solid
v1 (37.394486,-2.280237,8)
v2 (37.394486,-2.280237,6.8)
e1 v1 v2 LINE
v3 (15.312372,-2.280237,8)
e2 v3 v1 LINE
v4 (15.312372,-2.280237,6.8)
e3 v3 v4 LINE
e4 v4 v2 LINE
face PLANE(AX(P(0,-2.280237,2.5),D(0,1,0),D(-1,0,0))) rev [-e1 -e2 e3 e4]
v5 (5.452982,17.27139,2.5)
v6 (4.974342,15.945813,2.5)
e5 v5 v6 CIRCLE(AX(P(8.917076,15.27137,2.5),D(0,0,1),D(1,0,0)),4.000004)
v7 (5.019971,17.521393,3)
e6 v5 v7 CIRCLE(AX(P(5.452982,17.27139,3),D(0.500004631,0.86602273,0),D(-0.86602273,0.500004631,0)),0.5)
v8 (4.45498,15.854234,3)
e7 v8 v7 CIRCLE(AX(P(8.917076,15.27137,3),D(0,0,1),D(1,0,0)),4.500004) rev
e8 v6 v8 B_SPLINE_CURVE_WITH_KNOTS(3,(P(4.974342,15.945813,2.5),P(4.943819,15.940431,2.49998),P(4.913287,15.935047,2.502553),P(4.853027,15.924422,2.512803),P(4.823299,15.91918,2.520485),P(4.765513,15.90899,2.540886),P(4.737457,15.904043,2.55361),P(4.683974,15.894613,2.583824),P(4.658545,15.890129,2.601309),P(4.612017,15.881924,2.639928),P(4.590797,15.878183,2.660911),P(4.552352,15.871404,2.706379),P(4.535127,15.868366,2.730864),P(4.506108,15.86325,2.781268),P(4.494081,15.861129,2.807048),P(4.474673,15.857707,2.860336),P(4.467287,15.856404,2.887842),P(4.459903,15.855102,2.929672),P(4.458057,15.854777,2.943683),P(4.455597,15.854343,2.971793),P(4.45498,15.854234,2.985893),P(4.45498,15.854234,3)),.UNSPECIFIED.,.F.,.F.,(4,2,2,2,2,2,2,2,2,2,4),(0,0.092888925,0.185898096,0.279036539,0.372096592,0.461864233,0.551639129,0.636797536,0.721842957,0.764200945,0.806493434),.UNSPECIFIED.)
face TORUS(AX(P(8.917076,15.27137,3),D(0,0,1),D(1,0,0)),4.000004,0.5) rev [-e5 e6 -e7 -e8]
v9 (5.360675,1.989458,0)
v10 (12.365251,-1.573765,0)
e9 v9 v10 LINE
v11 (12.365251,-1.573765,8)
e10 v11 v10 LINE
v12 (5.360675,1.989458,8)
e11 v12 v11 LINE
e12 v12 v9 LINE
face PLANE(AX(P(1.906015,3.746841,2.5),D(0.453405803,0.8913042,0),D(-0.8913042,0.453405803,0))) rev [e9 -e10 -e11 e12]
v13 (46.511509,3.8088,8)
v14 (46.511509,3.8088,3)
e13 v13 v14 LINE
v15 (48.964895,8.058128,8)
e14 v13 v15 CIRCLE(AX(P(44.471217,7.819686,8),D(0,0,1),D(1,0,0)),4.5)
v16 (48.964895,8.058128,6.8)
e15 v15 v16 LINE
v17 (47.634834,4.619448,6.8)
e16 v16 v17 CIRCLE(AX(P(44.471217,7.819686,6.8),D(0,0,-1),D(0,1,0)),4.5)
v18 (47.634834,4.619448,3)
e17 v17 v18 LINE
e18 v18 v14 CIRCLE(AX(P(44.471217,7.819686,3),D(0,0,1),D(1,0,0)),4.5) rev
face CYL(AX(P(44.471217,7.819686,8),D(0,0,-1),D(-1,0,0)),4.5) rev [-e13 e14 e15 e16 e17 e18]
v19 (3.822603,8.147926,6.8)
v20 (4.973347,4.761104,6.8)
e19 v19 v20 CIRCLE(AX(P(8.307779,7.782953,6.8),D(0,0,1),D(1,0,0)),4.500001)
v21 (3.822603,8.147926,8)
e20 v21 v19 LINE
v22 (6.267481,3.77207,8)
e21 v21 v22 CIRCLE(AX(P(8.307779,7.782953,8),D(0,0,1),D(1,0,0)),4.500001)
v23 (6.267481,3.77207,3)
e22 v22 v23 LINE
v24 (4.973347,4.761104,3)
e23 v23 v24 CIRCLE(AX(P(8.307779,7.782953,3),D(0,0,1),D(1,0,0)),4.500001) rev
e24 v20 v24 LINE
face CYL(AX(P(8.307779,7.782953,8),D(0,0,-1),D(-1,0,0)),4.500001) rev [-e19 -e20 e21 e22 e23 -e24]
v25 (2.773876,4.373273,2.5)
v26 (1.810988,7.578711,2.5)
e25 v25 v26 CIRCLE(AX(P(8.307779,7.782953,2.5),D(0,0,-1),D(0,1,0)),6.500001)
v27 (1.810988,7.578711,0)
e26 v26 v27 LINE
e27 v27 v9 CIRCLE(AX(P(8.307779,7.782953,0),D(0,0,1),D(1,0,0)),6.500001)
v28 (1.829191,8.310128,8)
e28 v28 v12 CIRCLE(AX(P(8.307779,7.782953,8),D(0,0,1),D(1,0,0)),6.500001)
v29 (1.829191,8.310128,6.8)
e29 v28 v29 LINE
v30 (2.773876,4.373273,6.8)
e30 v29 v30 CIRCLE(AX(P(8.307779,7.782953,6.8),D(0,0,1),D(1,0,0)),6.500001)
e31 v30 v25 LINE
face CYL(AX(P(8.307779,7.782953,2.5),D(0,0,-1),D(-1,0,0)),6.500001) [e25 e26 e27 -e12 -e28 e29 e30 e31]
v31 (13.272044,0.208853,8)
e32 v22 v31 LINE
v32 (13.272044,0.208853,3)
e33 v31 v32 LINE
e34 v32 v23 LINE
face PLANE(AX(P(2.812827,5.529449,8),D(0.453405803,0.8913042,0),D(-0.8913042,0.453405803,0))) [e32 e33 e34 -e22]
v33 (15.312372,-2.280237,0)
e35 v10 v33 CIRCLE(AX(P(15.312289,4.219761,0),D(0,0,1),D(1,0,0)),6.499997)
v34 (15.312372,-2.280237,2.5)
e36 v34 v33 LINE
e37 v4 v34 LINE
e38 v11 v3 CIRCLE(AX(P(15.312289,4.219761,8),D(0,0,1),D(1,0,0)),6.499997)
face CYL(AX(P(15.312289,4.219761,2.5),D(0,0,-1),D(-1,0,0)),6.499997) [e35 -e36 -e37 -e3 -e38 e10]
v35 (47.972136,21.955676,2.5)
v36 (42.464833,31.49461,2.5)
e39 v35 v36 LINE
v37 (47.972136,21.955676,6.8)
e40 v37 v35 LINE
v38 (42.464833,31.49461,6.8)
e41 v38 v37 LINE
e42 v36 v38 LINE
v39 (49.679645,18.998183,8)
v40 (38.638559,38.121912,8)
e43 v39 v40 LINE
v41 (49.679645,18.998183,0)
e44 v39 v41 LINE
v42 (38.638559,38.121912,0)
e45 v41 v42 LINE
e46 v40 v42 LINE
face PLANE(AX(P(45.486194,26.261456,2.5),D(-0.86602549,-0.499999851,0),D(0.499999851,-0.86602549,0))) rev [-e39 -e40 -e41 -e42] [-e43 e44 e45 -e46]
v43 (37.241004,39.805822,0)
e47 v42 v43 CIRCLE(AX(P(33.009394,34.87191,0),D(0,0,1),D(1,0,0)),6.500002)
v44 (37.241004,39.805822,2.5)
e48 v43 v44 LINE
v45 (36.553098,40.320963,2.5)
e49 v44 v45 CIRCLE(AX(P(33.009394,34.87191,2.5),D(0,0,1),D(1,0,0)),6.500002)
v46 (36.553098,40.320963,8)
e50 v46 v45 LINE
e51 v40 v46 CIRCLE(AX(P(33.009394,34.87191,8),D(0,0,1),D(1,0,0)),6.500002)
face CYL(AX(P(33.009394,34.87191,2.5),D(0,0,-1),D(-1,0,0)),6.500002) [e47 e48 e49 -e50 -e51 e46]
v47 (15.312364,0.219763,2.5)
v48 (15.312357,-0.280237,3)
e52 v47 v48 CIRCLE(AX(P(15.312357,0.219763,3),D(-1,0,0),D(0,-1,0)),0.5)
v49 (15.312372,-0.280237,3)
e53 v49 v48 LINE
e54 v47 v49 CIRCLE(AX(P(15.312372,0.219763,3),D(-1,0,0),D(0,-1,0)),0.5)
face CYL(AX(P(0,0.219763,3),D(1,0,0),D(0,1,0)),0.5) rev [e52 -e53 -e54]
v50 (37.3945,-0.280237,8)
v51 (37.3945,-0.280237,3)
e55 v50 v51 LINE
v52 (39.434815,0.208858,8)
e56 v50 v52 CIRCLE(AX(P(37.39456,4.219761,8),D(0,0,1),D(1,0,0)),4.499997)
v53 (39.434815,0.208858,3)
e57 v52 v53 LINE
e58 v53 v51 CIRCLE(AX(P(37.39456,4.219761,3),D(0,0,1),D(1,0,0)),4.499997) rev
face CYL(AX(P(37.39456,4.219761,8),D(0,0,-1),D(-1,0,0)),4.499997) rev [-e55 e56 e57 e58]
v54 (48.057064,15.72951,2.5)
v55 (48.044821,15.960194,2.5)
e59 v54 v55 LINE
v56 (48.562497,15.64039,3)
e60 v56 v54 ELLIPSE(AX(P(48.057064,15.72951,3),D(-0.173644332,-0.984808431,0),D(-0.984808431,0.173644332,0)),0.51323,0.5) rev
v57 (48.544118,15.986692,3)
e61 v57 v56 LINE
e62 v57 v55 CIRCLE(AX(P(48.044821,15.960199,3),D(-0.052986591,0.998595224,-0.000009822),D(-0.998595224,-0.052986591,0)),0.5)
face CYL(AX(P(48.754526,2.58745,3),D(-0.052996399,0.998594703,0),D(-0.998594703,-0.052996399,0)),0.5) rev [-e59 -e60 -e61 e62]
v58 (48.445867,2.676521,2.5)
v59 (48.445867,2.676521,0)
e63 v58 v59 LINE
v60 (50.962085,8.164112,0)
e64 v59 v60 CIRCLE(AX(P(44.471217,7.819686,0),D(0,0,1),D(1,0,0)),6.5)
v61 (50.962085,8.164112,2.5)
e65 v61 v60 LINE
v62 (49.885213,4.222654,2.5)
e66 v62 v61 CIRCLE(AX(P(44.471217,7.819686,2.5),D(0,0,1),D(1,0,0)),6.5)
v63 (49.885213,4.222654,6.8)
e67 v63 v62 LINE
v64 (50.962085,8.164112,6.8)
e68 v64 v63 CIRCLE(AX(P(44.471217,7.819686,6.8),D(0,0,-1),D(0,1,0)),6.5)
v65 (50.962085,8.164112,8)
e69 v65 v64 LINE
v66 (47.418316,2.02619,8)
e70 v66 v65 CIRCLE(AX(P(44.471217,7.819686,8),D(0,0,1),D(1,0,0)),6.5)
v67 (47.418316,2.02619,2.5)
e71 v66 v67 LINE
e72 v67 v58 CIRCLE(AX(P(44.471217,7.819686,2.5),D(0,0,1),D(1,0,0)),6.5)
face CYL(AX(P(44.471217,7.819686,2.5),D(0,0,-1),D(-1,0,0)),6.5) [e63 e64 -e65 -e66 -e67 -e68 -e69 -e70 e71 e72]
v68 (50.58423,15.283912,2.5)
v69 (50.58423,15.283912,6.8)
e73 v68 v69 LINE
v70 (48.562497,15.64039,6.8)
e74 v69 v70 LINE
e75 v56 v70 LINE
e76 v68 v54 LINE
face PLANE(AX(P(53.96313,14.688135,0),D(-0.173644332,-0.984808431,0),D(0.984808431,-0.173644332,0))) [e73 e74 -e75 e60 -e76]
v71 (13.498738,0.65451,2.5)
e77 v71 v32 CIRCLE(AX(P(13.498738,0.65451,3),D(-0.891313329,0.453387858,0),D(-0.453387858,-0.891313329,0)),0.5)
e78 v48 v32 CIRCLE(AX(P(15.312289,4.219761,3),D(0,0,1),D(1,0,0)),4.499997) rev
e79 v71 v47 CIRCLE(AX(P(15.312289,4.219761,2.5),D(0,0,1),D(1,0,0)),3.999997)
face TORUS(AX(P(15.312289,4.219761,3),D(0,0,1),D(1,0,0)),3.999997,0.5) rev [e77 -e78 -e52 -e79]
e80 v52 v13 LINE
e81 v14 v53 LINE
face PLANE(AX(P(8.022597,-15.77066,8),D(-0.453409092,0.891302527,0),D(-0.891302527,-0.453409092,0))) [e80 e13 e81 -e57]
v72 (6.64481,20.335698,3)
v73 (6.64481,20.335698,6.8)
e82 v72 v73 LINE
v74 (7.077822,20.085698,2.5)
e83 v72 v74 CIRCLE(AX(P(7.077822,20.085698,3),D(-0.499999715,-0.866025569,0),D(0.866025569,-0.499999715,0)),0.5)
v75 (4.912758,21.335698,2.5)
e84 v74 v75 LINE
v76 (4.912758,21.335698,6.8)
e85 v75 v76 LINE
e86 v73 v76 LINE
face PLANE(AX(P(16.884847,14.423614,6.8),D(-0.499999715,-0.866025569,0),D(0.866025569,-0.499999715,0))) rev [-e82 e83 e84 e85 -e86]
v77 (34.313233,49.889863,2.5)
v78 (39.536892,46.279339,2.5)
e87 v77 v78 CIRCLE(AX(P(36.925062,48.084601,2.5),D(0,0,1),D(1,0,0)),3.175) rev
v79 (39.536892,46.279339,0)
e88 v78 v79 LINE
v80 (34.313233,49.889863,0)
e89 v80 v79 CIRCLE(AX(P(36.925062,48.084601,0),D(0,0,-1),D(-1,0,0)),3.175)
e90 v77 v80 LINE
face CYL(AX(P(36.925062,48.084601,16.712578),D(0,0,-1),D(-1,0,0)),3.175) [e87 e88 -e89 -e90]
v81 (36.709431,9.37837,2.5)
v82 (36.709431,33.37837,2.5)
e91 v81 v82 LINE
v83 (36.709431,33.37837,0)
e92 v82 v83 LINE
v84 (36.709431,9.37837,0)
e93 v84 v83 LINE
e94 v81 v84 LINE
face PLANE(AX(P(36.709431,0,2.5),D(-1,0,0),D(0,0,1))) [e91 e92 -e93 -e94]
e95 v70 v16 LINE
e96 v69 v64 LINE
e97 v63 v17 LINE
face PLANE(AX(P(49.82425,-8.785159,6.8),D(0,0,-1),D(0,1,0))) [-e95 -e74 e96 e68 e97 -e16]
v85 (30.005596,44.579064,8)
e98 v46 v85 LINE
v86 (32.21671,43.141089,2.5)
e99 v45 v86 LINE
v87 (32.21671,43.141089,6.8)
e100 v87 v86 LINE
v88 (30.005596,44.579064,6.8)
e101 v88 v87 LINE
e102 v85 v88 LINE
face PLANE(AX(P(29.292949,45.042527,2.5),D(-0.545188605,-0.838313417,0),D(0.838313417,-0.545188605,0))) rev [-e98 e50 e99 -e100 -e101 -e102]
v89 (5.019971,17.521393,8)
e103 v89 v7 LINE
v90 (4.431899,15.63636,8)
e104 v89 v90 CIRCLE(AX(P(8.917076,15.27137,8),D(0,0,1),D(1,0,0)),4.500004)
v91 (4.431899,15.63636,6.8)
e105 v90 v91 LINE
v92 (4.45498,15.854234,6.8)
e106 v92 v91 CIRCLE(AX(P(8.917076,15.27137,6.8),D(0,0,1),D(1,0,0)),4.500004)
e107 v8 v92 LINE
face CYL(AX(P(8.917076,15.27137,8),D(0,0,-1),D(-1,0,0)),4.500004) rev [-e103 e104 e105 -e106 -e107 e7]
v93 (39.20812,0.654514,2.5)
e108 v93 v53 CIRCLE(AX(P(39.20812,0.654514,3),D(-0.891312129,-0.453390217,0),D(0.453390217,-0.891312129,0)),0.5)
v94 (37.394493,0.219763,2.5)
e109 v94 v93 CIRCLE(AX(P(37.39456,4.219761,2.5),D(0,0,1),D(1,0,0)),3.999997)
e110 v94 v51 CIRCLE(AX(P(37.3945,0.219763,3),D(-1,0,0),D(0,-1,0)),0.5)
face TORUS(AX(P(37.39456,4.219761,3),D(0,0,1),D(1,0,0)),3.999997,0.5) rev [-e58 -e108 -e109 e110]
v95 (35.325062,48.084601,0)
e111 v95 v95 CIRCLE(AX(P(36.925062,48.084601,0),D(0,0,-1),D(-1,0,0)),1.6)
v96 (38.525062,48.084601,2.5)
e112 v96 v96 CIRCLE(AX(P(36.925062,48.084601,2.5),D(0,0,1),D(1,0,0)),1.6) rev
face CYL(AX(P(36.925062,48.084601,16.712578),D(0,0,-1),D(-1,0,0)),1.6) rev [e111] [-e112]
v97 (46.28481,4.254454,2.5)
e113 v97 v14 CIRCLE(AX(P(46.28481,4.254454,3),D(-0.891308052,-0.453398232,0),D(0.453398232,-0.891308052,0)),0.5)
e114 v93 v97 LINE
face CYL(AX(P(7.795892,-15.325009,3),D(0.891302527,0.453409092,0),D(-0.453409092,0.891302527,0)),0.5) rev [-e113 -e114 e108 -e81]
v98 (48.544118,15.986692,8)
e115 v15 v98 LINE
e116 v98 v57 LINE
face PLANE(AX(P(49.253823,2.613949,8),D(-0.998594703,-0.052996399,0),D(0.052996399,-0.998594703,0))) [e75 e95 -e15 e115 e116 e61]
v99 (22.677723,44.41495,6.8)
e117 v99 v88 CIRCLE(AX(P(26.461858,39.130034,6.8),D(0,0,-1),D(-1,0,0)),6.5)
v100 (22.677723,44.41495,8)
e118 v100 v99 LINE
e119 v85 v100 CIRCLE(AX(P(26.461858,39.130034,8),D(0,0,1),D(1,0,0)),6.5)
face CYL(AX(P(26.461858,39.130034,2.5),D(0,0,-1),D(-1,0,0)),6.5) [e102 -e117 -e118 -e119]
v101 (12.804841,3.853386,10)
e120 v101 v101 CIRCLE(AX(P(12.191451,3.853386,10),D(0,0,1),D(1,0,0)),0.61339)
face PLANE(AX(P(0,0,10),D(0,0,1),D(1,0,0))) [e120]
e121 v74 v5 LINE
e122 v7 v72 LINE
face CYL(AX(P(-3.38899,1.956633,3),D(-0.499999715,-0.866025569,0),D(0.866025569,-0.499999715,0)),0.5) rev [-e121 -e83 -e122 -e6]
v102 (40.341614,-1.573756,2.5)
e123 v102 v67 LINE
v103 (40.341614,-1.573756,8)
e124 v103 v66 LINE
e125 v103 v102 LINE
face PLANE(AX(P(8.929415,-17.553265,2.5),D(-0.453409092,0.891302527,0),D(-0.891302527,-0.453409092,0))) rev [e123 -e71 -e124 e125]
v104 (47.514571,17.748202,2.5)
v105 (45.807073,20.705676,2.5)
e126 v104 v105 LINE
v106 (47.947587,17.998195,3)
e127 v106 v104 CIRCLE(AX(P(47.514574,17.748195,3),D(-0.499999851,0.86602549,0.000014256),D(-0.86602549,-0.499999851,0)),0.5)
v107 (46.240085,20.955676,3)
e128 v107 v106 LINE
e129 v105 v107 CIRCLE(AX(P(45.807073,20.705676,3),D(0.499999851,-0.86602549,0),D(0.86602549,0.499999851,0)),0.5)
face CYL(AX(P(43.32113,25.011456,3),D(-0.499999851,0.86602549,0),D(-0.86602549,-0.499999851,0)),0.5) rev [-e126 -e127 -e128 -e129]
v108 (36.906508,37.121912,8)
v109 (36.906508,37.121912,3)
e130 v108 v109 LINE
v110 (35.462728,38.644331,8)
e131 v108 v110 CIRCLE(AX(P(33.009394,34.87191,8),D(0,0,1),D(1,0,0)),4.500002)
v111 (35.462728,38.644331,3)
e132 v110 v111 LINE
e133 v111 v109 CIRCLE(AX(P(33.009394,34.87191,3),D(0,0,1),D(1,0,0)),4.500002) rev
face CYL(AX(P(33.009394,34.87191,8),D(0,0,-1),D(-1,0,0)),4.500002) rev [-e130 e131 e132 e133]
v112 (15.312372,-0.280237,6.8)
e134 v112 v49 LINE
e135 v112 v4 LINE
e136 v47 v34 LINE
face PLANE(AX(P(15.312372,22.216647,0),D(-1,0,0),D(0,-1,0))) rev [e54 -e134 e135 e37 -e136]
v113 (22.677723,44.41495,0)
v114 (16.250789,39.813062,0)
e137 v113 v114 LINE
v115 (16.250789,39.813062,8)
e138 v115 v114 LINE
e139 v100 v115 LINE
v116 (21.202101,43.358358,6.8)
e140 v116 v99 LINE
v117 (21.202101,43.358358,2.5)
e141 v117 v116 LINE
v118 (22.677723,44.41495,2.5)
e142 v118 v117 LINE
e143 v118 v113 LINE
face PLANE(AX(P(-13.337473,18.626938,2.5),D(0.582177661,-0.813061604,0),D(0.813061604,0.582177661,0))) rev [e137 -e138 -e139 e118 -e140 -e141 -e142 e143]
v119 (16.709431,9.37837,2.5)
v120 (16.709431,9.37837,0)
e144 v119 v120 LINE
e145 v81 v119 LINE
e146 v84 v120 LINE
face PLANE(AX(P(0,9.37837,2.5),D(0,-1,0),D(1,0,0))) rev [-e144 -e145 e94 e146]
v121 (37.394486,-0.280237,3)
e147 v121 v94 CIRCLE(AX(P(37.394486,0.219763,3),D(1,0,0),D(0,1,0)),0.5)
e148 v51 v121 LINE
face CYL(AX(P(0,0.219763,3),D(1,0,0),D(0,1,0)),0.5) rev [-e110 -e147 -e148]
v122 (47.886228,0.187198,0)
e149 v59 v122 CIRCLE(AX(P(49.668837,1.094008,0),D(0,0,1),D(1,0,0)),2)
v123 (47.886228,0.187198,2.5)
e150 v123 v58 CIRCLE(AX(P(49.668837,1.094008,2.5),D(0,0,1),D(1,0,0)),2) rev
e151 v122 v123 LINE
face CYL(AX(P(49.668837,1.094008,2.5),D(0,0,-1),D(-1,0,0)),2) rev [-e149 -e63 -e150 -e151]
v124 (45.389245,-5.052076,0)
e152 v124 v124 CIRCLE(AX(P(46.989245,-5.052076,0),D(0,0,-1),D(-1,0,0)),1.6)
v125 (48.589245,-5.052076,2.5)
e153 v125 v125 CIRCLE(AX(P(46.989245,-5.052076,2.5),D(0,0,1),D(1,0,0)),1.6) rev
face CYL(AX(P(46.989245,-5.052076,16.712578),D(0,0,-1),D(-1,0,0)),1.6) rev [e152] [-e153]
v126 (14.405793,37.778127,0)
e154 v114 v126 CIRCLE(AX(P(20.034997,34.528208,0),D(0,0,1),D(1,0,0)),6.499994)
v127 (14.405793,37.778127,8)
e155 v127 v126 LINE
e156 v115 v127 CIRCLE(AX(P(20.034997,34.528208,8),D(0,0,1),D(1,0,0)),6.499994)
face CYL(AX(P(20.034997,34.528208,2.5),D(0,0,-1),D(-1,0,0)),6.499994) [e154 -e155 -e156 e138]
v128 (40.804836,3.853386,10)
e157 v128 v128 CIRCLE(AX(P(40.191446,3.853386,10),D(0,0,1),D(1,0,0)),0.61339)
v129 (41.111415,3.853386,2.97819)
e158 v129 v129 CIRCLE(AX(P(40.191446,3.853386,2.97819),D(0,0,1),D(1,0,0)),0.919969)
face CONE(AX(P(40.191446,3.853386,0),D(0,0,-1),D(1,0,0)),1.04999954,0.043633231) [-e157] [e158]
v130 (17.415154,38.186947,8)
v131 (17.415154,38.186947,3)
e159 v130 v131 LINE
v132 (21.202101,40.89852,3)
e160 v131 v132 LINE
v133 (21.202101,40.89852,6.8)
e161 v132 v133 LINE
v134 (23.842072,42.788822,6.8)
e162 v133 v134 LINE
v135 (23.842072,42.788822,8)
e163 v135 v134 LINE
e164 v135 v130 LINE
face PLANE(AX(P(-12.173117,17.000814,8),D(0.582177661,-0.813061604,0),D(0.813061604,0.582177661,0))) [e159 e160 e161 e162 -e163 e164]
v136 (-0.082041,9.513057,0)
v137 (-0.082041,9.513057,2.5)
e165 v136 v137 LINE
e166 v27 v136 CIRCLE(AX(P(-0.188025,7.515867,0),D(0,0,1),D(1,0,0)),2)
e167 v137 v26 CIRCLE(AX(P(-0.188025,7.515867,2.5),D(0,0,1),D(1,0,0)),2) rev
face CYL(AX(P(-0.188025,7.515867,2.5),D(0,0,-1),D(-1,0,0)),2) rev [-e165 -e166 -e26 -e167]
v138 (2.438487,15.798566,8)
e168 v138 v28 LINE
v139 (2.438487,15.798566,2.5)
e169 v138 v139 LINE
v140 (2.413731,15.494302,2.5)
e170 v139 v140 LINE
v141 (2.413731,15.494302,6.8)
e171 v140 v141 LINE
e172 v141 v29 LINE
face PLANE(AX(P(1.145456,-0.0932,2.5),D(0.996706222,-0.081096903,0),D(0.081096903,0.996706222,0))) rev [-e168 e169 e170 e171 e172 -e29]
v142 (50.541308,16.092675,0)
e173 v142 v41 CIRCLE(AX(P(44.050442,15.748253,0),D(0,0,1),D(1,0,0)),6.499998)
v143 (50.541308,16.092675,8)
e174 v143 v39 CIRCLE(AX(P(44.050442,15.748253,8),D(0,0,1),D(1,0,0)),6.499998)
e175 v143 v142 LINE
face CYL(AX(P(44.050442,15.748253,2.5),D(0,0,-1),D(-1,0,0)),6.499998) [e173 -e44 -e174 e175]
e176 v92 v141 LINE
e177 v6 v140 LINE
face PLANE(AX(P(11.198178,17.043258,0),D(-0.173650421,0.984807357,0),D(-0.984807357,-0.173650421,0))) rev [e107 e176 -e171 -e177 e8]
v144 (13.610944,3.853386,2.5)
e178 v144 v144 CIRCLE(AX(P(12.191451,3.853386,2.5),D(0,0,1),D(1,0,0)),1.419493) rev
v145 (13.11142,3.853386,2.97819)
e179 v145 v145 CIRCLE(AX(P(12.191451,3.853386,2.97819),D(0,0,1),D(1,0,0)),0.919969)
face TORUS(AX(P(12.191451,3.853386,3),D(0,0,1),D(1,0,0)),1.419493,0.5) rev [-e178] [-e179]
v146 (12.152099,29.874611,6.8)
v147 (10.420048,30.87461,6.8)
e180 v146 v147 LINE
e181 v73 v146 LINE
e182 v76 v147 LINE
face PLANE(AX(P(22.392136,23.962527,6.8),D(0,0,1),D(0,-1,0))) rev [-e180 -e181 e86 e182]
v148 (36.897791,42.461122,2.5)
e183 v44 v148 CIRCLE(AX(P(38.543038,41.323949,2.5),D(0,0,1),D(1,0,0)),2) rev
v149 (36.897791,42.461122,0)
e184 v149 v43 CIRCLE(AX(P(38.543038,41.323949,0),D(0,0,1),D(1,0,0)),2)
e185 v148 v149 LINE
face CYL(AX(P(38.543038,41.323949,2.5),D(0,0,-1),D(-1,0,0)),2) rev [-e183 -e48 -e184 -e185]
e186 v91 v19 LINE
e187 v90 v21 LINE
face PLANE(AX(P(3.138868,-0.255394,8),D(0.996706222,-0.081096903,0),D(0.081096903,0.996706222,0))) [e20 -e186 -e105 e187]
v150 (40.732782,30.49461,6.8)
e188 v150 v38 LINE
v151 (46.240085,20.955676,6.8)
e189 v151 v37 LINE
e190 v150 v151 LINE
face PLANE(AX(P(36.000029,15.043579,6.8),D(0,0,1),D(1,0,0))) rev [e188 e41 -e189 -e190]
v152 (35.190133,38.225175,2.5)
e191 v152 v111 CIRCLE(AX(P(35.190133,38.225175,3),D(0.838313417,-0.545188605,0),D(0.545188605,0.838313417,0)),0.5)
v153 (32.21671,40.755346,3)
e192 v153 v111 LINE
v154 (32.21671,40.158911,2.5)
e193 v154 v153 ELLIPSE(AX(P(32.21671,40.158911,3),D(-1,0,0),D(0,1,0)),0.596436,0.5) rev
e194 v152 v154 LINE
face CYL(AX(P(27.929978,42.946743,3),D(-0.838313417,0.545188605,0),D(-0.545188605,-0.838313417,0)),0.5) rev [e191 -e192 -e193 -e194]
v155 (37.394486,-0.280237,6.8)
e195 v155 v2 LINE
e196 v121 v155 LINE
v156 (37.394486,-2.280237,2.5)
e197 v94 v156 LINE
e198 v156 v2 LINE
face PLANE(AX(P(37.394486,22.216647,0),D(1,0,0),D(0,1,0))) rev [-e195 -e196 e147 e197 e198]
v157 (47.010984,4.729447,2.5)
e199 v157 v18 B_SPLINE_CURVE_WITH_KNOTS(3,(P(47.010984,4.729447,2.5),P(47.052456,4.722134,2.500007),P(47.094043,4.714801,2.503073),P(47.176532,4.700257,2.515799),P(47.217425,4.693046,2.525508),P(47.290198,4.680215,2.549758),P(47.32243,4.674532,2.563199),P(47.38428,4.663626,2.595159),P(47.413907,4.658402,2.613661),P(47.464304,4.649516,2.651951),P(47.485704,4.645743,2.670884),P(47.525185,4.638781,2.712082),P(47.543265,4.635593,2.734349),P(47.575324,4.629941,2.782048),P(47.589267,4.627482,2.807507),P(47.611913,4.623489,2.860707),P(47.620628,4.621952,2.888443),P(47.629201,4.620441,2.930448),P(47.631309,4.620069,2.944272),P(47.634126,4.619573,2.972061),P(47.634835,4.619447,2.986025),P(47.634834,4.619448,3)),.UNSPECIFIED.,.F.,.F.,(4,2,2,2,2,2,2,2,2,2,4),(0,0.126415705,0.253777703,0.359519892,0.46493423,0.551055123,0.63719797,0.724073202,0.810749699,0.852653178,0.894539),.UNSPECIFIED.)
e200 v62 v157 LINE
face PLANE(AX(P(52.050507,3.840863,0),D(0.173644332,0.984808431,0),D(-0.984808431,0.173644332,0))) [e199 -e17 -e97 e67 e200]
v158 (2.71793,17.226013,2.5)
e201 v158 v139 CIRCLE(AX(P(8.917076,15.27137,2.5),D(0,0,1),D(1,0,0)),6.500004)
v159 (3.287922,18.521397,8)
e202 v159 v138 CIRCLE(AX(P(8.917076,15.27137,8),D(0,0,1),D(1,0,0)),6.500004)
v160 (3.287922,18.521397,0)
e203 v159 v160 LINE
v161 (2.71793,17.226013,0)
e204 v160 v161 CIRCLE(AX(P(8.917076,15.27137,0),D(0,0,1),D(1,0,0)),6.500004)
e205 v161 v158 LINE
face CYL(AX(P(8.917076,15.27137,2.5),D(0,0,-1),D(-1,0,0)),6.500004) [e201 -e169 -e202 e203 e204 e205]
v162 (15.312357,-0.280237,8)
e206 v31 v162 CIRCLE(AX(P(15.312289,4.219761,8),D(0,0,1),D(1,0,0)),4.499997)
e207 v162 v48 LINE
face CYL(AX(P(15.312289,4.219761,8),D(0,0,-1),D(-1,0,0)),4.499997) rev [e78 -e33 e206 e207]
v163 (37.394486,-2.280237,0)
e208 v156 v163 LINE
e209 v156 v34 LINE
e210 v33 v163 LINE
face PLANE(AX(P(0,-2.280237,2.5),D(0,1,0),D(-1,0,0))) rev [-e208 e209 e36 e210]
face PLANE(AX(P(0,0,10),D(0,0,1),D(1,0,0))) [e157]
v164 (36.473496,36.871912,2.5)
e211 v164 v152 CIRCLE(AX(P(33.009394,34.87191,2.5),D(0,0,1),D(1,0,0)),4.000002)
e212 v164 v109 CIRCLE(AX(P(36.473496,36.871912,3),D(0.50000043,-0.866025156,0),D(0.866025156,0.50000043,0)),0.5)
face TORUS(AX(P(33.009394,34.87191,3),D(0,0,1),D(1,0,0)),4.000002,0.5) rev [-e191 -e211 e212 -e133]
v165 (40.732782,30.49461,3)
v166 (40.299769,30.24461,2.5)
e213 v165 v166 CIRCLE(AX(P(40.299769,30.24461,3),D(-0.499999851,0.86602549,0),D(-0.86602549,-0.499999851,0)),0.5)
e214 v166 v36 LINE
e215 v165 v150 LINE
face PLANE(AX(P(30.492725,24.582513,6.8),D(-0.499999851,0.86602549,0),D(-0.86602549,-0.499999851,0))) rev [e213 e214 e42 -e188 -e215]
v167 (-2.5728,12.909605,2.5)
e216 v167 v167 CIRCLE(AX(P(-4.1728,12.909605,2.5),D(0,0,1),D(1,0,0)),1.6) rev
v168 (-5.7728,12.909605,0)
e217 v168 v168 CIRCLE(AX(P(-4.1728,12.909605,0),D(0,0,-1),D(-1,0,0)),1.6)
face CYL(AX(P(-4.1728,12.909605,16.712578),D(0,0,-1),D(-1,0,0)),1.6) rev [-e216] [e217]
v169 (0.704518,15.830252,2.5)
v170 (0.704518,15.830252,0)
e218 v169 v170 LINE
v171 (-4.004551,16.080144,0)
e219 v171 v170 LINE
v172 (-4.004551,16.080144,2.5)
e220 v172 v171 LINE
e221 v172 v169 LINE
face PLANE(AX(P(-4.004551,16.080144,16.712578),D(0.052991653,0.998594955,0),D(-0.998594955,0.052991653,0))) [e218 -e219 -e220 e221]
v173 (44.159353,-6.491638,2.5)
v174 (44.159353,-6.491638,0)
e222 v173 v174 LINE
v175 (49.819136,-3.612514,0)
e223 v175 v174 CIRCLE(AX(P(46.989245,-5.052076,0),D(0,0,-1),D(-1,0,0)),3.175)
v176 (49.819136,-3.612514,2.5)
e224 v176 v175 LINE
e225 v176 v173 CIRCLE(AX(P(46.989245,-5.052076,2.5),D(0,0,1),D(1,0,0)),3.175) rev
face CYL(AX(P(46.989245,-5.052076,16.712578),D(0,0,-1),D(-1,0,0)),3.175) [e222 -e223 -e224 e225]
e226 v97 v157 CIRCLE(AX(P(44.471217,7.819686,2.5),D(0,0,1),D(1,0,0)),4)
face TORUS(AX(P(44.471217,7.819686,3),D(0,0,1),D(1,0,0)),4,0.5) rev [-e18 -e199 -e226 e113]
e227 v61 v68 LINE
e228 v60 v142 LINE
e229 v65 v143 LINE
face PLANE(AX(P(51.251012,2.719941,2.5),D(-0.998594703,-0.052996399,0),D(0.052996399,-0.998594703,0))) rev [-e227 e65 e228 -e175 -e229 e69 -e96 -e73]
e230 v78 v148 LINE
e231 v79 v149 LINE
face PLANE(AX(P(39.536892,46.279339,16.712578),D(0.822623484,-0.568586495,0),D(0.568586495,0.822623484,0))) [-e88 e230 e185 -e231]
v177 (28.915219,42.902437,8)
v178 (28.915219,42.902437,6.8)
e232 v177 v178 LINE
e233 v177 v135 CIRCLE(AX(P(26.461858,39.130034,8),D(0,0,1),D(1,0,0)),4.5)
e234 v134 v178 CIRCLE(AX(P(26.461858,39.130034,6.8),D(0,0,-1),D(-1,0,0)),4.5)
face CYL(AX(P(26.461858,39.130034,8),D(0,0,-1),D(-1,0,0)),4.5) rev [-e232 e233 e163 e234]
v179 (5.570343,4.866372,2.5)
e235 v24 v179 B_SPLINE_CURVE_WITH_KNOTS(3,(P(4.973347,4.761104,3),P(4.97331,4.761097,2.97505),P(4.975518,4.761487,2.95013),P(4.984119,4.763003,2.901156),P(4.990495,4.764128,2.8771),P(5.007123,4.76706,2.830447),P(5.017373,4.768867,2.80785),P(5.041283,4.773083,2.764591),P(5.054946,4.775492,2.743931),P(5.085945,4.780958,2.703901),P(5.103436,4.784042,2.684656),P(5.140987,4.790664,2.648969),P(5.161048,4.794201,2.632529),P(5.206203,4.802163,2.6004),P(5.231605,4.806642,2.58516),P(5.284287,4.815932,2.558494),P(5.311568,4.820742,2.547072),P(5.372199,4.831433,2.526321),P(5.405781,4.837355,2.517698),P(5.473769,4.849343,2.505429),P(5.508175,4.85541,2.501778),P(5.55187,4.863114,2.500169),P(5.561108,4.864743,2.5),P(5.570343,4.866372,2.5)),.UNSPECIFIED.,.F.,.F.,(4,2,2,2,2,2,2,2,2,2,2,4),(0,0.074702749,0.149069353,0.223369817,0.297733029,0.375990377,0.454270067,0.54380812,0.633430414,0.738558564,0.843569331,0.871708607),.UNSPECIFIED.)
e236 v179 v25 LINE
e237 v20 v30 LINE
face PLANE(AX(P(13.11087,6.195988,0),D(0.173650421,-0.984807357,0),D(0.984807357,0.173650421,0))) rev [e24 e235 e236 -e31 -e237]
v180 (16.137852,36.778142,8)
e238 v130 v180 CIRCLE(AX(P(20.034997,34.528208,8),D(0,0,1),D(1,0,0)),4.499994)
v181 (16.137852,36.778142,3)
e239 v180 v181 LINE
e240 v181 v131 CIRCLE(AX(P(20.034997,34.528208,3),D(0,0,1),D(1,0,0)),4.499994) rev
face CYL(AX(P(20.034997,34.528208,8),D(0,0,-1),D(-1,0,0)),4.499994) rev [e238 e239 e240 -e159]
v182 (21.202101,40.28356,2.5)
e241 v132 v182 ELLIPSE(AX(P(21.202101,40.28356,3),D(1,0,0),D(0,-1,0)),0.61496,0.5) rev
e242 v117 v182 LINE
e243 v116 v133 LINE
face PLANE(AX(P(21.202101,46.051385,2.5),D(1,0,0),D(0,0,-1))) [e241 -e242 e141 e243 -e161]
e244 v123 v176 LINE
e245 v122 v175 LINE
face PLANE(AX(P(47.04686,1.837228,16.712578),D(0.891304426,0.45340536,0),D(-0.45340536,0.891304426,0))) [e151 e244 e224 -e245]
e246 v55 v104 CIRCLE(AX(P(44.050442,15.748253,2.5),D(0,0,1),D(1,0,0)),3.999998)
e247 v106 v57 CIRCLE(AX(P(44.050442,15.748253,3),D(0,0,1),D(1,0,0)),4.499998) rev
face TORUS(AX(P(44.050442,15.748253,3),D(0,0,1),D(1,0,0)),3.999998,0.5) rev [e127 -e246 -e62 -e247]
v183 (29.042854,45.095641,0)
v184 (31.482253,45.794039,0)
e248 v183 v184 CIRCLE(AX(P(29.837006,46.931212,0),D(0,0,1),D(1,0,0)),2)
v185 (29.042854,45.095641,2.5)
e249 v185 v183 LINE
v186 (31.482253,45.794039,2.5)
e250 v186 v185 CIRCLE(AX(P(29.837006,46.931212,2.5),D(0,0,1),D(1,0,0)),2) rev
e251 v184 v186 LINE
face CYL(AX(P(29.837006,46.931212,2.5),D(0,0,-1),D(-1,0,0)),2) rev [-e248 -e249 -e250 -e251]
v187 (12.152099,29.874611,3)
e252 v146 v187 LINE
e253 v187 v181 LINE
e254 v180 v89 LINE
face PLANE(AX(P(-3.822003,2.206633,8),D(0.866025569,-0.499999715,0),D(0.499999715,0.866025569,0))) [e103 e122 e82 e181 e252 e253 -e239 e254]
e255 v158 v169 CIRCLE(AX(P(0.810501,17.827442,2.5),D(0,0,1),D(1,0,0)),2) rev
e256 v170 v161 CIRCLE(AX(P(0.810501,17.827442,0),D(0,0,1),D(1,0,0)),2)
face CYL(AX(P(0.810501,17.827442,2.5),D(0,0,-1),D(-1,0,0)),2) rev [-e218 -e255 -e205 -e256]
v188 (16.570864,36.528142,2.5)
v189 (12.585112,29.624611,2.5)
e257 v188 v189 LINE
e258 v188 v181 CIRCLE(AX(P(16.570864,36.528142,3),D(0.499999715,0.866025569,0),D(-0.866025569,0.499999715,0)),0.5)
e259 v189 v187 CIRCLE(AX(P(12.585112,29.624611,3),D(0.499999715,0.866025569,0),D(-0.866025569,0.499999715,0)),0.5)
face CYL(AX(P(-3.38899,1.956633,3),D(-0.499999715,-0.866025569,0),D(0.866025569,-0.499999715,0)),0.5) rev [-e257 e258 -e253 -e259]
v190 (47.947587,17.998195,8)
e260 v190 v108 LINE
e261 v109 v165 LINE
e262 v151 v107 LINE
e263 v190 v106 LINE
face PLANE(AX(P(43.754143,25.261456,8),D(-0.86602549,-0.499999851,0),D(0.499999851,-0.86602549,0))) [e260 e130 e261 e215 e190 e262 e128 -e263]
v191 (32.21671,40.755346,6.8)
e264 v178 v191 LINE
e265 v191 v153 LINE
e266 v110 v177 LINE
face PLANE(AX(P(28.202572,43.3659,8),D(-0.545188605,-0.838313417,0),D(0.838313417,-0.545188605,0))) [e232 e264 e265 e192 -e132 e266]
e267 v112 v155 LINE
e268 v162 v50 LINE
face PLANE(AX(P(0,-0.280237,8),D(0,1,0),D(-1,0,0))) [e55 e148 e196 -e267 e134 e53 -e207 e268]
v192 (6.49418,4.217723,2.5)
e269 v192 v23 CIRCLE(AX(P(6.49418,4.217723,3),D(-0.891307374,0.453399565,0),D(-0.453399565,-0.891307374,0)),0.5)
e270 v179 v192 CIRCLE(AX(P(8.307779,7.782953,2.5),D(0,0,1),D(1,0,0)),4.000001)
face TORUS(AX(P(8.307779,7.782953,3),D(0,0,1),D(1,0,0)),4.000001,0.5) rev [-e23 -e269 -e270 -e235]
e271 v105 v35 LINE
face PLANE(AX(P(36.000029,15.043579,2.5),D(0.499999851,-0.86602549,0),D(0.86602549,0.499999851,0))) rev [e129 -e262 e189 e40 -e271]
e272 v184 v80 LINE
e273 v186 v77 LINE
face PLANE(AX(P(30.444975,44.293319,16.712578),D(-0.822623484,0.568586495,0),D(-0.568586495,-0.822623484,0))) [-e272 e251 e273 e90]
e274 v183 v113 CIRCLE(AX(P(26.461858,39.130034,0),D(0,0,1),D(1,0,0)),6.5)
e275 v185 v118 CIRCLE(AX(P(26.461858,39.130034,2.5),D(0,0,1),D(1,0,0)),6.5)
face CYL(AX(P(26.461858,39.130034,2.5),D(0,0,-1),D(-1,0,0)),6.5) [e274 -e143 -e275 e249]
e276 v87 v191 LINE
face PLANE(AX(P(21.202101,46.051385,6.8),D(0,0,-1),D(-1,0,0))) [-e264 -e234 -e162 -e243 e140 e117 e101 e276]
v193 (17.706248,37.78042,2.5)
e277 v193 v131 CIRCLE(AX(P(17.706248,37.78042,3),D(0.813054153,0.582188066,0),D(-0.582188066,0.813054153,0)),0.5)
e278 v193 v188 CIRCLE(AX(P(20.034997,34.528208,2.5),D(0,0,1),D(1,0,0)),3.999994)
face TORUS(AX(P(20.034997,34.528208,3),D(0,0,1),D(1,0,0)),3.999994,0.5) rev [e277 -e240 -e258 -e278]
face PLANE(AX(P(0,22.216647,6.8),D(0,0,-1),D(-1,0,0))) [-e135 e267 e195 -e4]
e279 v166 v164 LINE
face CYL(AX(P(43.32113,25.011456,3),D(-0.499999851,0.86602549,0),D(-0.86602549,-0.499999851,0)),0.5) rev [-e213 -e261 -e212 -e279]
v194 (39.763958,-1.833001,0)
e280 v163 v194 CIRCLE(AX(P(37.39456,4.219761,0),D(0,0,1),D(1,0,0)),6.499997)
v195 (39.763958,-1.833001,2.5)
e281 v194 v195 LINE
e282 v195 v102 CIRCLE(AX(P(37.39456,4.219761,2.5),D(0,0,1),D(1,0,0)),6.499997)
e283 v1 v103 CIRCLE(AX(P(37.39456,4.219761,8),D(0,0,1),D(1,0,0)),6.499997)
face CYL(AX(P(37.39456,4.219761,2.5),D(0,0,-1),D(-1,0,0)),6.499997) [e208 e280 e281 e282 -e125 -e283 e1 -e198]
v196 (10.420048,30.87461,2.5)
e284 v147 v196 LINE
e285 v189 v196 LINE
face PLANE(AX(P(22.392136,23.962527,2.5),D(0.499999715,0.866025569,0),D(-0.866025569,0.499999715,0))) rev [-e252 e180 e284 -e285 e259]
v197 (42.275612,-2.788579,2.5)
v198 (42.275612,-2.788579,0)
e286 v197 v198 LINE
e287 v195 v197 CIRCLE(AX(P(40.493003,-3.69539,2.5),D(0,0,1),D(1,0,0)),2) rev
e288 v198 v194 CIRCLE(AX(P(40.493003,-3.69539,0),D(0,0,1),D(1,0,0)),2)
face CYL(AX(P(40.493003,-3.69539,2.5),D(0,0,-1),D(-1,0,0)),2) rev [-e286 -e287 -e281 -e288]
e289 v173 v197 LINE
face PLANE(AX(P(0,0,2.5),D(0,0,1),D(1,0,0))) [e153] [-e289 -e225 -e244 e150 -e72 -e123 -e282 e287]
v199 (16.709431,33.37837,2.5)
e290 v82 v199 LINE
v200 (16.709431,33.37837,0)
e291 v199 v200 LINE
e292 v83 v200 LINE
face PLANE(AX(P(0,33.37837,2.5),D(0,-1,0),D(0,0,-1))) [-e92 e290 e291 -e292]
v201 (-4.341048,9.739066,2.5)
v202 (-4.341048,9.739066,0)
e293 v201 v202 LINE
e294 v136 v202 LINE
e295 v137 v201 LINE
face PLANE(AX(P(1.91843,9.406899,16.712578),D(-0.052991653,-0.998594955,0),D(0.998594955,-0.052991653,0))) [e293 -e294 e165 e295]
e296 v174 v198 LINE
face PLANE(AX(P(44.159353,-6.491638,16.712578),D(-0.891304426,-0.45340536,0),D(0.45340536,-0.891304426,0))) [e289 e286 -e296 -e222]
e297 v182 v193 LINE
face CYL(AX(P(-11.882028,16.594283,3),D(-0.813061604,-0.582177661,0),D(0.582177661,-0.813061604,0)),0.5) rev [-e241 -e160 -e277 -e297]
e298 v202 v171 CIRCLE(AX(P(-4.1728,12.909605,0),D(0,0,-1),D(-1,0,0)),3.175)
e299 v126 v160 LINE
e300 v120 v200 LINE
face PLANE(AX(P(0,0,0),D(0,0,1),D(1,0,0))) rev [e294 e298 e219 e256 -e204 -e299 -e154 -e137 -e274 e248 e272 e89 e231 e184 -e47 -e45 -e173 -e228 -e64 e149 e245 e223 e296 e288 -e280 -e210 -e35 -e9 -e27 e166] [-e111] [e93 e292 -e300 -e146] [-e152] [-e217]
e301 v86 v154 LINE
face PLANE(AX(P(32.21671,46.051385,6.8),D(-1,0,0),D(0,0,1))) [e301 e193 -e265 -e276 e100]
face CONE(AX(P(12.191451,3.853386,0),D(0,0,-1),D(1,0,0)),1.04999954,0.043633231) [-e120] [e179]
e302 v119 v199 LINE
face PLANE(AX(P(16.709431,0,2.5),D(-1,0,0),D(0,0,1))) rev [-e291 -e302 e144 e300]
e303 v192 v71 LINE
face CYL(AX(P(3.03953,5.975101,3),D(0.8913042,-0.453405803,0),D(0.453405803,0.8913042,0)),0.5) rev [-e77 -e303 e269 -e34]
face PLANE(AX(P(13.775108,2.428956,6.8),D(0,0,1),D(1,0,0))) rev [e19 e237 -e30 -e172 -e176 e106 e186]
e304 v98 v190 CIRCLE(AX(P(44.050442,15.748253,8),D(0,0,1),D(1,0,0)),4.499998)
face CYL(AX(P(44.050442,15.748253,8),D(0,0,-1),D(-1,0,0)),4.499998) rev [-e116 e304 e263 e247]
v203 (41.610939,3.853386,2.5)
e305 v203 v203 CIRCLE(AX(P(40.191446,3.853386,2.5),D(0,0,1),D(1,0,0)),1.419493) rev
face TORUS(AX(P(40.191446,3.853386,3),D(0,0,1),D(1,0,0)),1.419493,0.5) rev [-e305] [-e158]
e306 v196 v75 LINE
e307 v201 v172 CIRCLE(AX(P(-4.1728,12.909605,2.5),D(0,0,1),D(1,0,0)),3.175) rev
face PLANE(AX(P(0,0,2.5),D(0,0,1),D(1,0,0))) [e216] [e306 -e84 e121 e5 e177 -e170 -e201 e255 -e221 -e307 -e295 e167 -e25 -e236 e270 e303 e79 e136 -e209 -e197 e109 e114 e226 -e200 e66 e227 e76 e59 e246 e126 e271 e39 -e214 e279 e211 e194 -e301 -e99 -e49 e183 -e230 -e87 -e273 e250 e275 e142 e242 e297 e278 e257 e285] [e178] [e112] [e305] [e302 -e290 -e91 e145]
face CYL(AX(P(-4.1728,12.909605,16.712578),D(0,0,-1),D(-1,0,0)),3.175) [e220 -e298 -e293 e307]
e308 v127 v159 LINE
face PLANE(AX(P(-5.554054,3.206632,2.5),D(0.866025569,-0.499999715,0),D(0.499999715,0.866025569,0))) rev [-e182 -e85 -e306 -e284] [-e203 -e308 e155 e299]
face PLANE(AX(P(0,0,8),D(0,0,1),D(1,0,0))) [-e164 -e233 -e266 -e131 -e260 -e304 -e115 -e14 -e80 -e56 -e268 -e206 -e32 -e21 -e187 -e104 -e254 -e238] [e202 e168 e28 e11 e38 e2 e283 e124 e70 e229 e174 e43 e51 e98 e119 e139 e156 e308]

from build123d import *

# Parameters (mm, degrees)
SKETCH4_W                     = 20
SKETCH4_H                     = 24
BOSS_EXTRUDE1_DEPTH           = 2.5
BOSS_EXTRUDE3_DEPTH           = 8
SKETCH4_5_R                   = 1.04999954
BOSS_EXTRUDE4_DEPTH           = 10
BOSS_EXTRUDE4_DRAFT           = 2.5
BOSS_EXTRUDE4_PROFILE_2_DEPTH = 10
BOSS_EXTRUDE4_PROFILE_2_DRAFT = 2.5
SKETCH5_W                     = 22.082114238
SKETCH5_H                     = 4.3
CUT_EXTRUDE1_DEPTH            = 2
SKETCH6_W                     = 4.3
SKETCH6_H                     = 11.01458554
CUT_EXTRUDE2_DEPTH            = 2
SKETCH7_W                     = 4.3
SKETCH7_H                     = 11.01461094
CUT_EXTRUDE3_DEPTH            = 2
SKETCH8_W                     = 11.0146084
SKETCH8_H                     = 4.3
CUT_EXTRUDE5_DEPTH            = 7
CUT_EXTRUDE6_DEPTH            = 7
CUT_EXTRUDE6_DEPTH_BACK       = 7
SKETCH9_W                     = 4.3
SKETCH9_H                     = 11.01461094
SKETCH10_W                    = 4.3
SKETCH10_H                    = 11.01460078
CUT_EXTRUDE7_DEPTH            = 50.390708853
FILLET1_R                     = 0.5
SKETCH11_R                    = 1.6
BOSS_EXTRUDE5_DEPTH           = 2.5
FILLET2_R                     = 2
FILLET3_R                     = 0.5


with BuildPart() as part:
    # Sketch4 → Boss-Extrude1 (new body)
    with BuildSketch(Plane.XY):
        with BuildLine():
            Line((14.40579252, 37.778127459), (3.287922462, 18.521396993))
            ThreePointArc((3.287922462, 18.521396993), (2.712012987, 17.207148367), (2.438487448, 15.798565764))
            Line((2.438487448, 15.798565764), (1.829191453, 8.310127992))
            ThreePointArc((1.829191453, 8.310127992), (2.63339515, 4.61256251), (5.360675193, 1.989457929))
            Line((5.360675193, 1.989457929), (12.365250755, -1.573764605))
            ThreePointArc((12.365250755, -1.573764605), (13.797062184, -2.101161427), (15.312371851, -2.28023681))
            Line((15.312371851, -2.28023681), (37.394486089, -2.28023681))
            ThreePointArc((37.394486089, -2.28023681), (38.909799875, -2.101158221), (40.3416142, -1.57375633))
            Line((40.3416142, -1.57375633), (47.418316215, 2.026189747))
            ThreePointArc((47.418316215, 2.026189747), (50.100366868, 4.569660453), (50.962085043, 8.164111834))
            Line((50.962085043, 8.164111834), (50.541308423, 16.092675178))
            ThreePointArc((50.541308423, 16.092675178), (50.282176527, 17.596348563), (49.679645161, 18.998182698))
            Line((49.679645161, 18.998182698), (38.638559268, 38.121912018))
            ThreePointArc((38.638559268, 38.121912018), (37.725784419, 39.344680467), (36.553097986, 40.32096277))
            Line((36.553097986, 40.32096277), (30.005596257, 44.579063932))
            ThreePointArc((30.005596257, 44.579063932), (26.31632103, 45.628405202), (22.677723188, 44.41494958))
            Line((22.677723188, 44.41494958), (16.250788585, 39.813062423))
            ThreePointArc((16.250788585, 39.813062423), (15.219571198, 38.894166534), (14.40579252, 37.778127459))
        make_face()
        with Locations((26.709430744, 21.378369589)):
            Rectangle(SKETCH4_W, SKETCH4_H, mode=Mode.SUBTRACT)
    extrude(amount=BOSS_EXTRUDE1_DEPTH)

    # Sketch4<4> → Boss-Extrude3 (add)
    with BuildSketch(Plane.XY):
        with BuildLine():
            Line((22.677723188, 44.41494958), (16.250788585, 39.813062423))
            ThreePointArc((16.250788585, 39.813062423), (15.219571198, 38.894166534), (14.40579252, 37.778127459))
            Line((14.40579252, 37.778127459), (3.287922462, 18.521396993))
            ThreePointArc((3.287922462, 18.521396993), (2.712012987, 17.207148367), (2.438487448, 15.798565764))
            Line((2.438487448, 15.798565764), (1.829191453, 8.310127992))
            ThreePointArc((1.829191453, 8.310127992), (2.63339515, 4.61256251), (5.360675193, 1.989457929))
            Line((5.360675193, 1.989457929), (12.365250755, -1.573764605))
            ThreePointArc((12.365250755, -1.573764605), (13.797062184, -2.101161427), (15.312371851, -2.28023681))
            Line((15.312371851, -2.28023681), (37.394486089, -2.28023681))
            ThreePointArc((37.394486089, -2.28023681), (38.909799875, -2.101158221), (40.3416142, -1.57375633))
            Line((40.3416142, -1.57375633), (47.418316215, 2.026189747))
            ThreePointArc((47.418316215, 2.026189747), (50.100366868, 4.569660453), (50.962085043, 8.164111834))
            Line((50.962085043, 8.164111834), (50.541308423, 16.092675178))
            ThreePointArc((50.541308423, 16.092675178), (50.282176527, 17.596348563), (49.679645161, 18.998182698))
            Line((49.679645161, 18.998182698), (38.638559268, 38.121912018))
            ThreePointArc((38.638559268, 38.121912018), (37.725784419, 39.344680467), (36.553097986, 40.32096277))
            Line((36.553097986, 40.32096277), (30.005596257, 44.579063932))
            ThreePointArc((30.005596257, 44.579063932), (26.31632103, 45.628405202), (22.677723188, 44.41494958))
        make_face()
        with BuildLine():
            ThreePointArc((28.915219047, 42.902437098), (26.361103849, 43.62890664), (23.842072273, 42.788821908))
            Line((23.842072273, 42.788821908), (17.415154311, 38.186946666))
            ThreePointArc((17.415154311, 38.186946666), (16.701235421, 37.550786049), (16.137851593, 36.778141775))
            Line((16.137851593, 36.778141775), (5.01997076, 17.521392647))
            ThreePointArc((5.01997076, 17.521392647), (4.621263952, 16.611530408), (4.43189892, 15.636360013))
            Line((4.43189892, 15.636360013), (3.822603234, 8.147926041))
            ThreePointArc((3.822603234, 8.147926041), (4.379359007, 5.588067615), (6.267480562, 3.772069503))
            Line((6.267480562, 3.772069503), (13.272044416, 0.208852925))
            ThreePointArc((13.272044416, 0.208852925), (14.263297755, -0.156264413), (15.312356713, -0.280236811))
            Line((15.312356713, -0.280236811), (37.394499544, -0.280236811))
            ThreePointArc((37.394499544, -0.280236811), (38.443560406, -0.156262143), (39.434814891, 0.208858326))
            Line((39.434814891, 0.208858326), (46.511508891, 3.808800326))
            ThreePointArc((46.511508891, 3.808800326), (48.368316966, 5.56966202), (48.964895143, 8.058128338))
            Line((48.964895143, 8.058128338), (48.544118496, 15.986692189))
            ThreePointArc((48.544118496, 15.986692189), (48.364721527, 17.027695486), (47.947587053, 17.998195342))
            Line((47.947587053, 17.998195342), (36.906508289, 37.121912315))
            ThreePointArc((36.906508289, 37.121912315), (36.274587318, 37.968443941), (35.462727713, 38.644331426))
            Line((35.462727713, 38.644331426), (28.915219047, 42.902437098))
        make_face(mode=Mode.SUBTRACT)
    extrude(amount=BOSS_EXTRUDE3_DEPTH)


with BuildPart() as body_2:
    # Sketch4<5> → Boss-Extrude4 (with draft: the straight prism first)
    with BuildSketch(Plane.XY):
        with Locations((12.191451144, 3.853385589)):
            Circle(SKETCH4_5_R)
    extrude(amount=BOSS_EXTRUDE4_DEPTH)
    # Boss-Extrude4: the draft: its side faces are tilted about the plane it starts from
    boss_extrude4_sides = [body_2.faces().sort_by_distance(p)[0] for p in [
        (11.141451604, 3.853385589, 5),
    ]]
    draft(boss_extrude4_sides, Plane.XY, BOSS_EXTRUDE4_DRAFT)


with BuildPart() as body_3:
    # Sketch4<5> → Boss-Extrude4 profile 2 (with draft: the straight prism first)
    with BuildSketch(Plane.XY):
        with Locations((40.191445944, 3.853385589)):
            Circle(SKETCH4_5_R)
    extrude(amount=BOSS_EXTRUDE4_PROFILE_2_DEPTH)
    # Boss-Extrude4 profile 2: the draft: its side faces are tilted about the plane it starts from
    boss_extrude4_profile_2_sides = [body_3.faces().sort_by_distance(p)[0] for p in [
        (39.141446404, 3.853385589, 5),
    ]]
    draft(boss_extrude4_profile_2_sides, Plane.XY, BOSS_EXTRUDE4_PROFILE_2_DRAFT)

    # Combine1: union body 2, part
    add(body_2.part)
    add(part.part)

    # Sketch5 → Cut-Extrude1 (cut)
    with BuildSketch(Plane.XZ.offset(2.28023681)):
        with Locations((26.35342897, 4.65)):
            Rectangle(SKETCH5_W, SKETCH5_H)
    extrude(amount=-CUT_EXTRUDE1_DEPTH, mode=Mode.SUBTRACT)

    # Sketch6 → Cut-Extrude2 (cut)
    with BuildSketch(Plane(origin=(-5.554054319, 3.206632316, 0), x_dir=(0, 0, 1), z_dir=(-0.8660255685351766, 0.4999997146432426, 0))):
        with Locations((4.65, 26.440930265)):
            Rectangle(SKETCH6_W, SKETCH6_H)
    extrude(amount=-CUT_EXTRUDE2_DEPTH, mode=Mode.SUBTRACT)

    # Sketch7 → Cut-Extrude3 (cut)
    with BuildSketch(Plane(origin=(45.486194048, 26.261455964, 0), x_dir=(0, 0, -1), z_dir=(0.8660254896413927, 0.49999985129136404, 0))):
        with Locations((-4.65, 0.535419369)):
            Rectangle(SKETCH7_W, SKETCH7_H)
    extrude(amount=-CUT_EXTRUDE3_DEPTH, mode=Mode.SUBTRACT)

    # Sketch8 → Cut-Extrude5 (cut)
    with BuildSketch(Plane(origin=(0, 39.051384789, 0), x_dir=(1, 0, 0), z_dir=(0, 1, 0))):
        with Locations((26.709405344, -4.65)):
            Rectangle(SKETCH8_W, SKETCH8_H)
    extrude(amount=CUT_EXTRUDE5_DEPTH, mode=Mode.SUBTRACT)

    # Sketch9 → Cut-Extrude6 (cut, two sides: drawn at the far end of the back side and taken through both)
    with BuildSketch(Plane(origin=(6.217218431, 4.980434971, 0), x_dir=(0, 0, -1), z_dir=(0.9848073574644705, 0.1736504209146836, 0)).offset(-CUT_EXTRUDE6_DEPTH_BACK)):
        with Locations((-4.65, 5.50730547)):
            Rectangle(SKETCH9_W, SKETCH9_H)
    extrude(amount=CUT_EXTRUDE6_DEPTH + CUT_EXTRUDE6_DEPTH_BACK, mode=Mode.SUBTRACT)

    # Sketch10 → Cut-Extrude7 (cut, through all)
    with BuildSketch(Plane(origin=(40.798758754, 17.009315643, 0), x_dir=(0, 0, -1), z_dir=(0.984808431082818, -0.17364433209350222, 0))):
        with Locations((-4.65, -5.50730039)):
            Rectangle(SKETCH10_W, SKETCH10_H)
    extrude(amount=CUT_EXTRUDE7_DEPTH, mode=Mode.SUBTRACT)

    # Fillet1
    fillet1_edges = [body_3.edges().sort_by_distance(p)[0] for p in [
        (47.093836217, 19.476935754, 2.5),
        (36.274587318, 37.968443941, 2.5),
        (33.839718629, 39.699838877, 2.5),
        (38.819644919, 33.808261157, 2.5),
        (48.364721527, 17.027695486, 2.5),
        (48.553307785, 15.813541277, 2.5),
        (42.973161891, 2.008829326, 2.5),
        (38.443560406, -0.156262143, 2.5),
        (37.394492817, -0.280236811, 2.5),
        (14.263297755, -0.156264413, 2.5),
        (9.769762489, 1.990461214, 2.5),
        (5.575293328, 4.207547209, 2.5),
        (4.655161471, 16.715709164, 2.5),
        (5.832390176, 18.928545423, 2.5),
        (16.701235421, 37.550786049, 2.5),
        (19.308627728, 39.542733139, 2.5),
        (47.104551996, 4.17063929, 2.5),
        (15.312364282, -0.280236811, 2.5),
        (14.144975406, 33.32637634, 2.5),
    ]]
    fillet(fillet1_edges, radius=FILLET1_R)

    # Sketch11 → Boss-Extrude5 (add)
    # profile 1 of 3: a face of its own
    with BuildSketch(Plane(origin=(0, 0, 0), x_dir=(-1, 0, 0), z_dir=(0, 0, -1))):
        with BuildLine():
            Line((4.004551173, 16.080144072), (-2.43359986, 15.738495777))
            Line((-2.43359986, 15.738495777), (-1.918430141, 9.406899296))
            Line((-1.918430141, 9.406899296), (4.341048167, 9.739066105))
            ThreePointArc((4.341048167, 9.739066105), (7.343338654, 13.077853585), (4.004551173, 16.080144072))
        make_face()
        with Locations((4.17279967, 12.909605088)):
            Circle(SKETCH11_R, mode=Mode.SUBTRACT)
    # profile 2 of 3: a face of its own
    with BuildSketch(Plane(origin=(0, 0, 0), x_dir=(-1, 0, 0), z_dir=(0, 0, -1))):
        with BuildLine():
            Line((-44.159353036, -6.491637762), (-41.387088639, -1.041919381))
            Line((-41.387088639, -1.041919381), (-47.046859688, 1.837228354))
            Line((-47.046859688, 1.837228354), (-49.819136139, -3.612513724))
            ThreePointArc((-49.819136139, -3.612513724), (-48.428806607, -7.881967295), (-44.159353036, -6.491637762))
        make_face()
        with Locations((-46.989244588, -5.052075743)):
            Circle(SKETCH11_R, mode=Mode.SUBTRACT)
    # profile 3 of 3: a face of its own
    with BuildSketch(Plane(origin=(0, 0, 0), x_dir=(-1, 0, 0), z_dir=(0, 0, -1))):
        with BuildLine():
            Line((-39.536891671, 46.279338916), (-35.7703782, 40.829996624))
            Line((-35.7703782, 40.829996624), (-30.444974788, 44.293318572))
            Line((-30.444974788, 44.293318572), (-34.313232544, 49.889863162))
            ThreePointArc((-34.313232544, 49.889863162), (-38.730324231, 50.696430602), (-39.536891671, 46.279338916))
        make_face()
        with Locations((-36.925062108, 48.084601039)):
            Circle(SKETCH11_R, mode=Mode.SUBTRACT)
    extrude(amount=-BOSS_EXTRUDE5_DEPTH)

    # Fillet2
    # the kernel refuses this fillet: 2 mm, written as the material it adds along each edge
    with BuildSketch(Plane(origin=(1.918430141, 9.406899296, 0), x_dir=(-0.05866855654021314, -0.9982775167624921, 0), z_dir=(0, 0, 1))) as fillet2_piece_1:
        with BuildLine():
            CenterArc((2.011357854, -1.991882194), FILLET2_R, 95.164032514, 85.161738675)
            Line((0.011390182, -2.003253693), (-0.188606585, -2.004390842))
            Line((-0.188606585, -2.004390842), (-0.199996767, -0.00113715))
            Line((-0.199996767, -0.00113715), (0.00449638, 0.19994945))
            ThreePointArc((0.00449638, 0.19994945), (1.104615402, 0.175210432), (1.813341585, 0.199188219))
            Line((1.813341585, 0.199188219), (1.831343064, 0))
        make_face()
    extrude(amount=2.5)
    with BuildSketch(Plane(origin=(2.43359986, 15.738495777, 0), x_dir=(0.1877449161137976, 0.9822178202788947, 0), z_dir=(0, 0, 1))) as fillet2_piece_2:
        with BuildLine():
            CenterArc((1.747071195, 1.986425497), FILLET2_R, 187.783588402, 75.537117688)
            Line((-0.234502152, 1.715561935), (-0.432659487, 1.688475579))
            Line((-0.432659487, 1.688475579), (-0.198157335, -0.027086356))
            Line((-0.198157335, -0.027086356), (0.021494341, -0.198841629))
            ThreePointArc((0.021494341, -0.198841629), (0.081411755, -0.192364689), (1.491185217, -0.19864255))
            Line((1.491185217, -0.19864255), (1.514447579, 0))
        make_face()
    extrude(amount=2.5)
    with BuildSketch(Plane(origin=(47.046859688, 1.837228354, 0), x_dir=(0.8575232290308502, 0.5144452465253264, 0), z_dir=(0, 0, 1))) as fillet2_piece_3:
        with BuildLine():
            CenterArc((1.866060415, -1.986192029), FILLET2_R, 96.736553334, 79.265444126)
            Line((-0.129072548, -1.846748636), (-0.328585844, -1.832804297))
            Line((-0.328585844, -1.832804297), (-0.199513296, 0.013944339))
            Line((-0.199513296, 0.013944339), (0.013943504, 0.199513355))
            ThreePointArc((0.013943504, 0.199513355), (0.429688452, 0.17045795), (1.607990884, 0.198619203))
            Line((1.607990884, 0.198619203), (1.63145175, 0))
        make_face()
    extrude(amount=2.5)
    with BuildSketch(Plane(origin=(41.387088639, -1.041919381, 0), x_dir=(-0.8989189088243236, -0.4381150480845044, 0), z_dir=(0, 0, 1))) as fillet2_piece_4:
        with BuildLine():
            CenterArc((1.966235607, 1.993542475), FILLET2_R, 180.97870365, 84.415840865)
            Line((-0.033472619, 1.959380935), (-0.233443442, 1.95596478))
            Line((-0.233443442, 1.95596478), (-0.199970823, -0.003416154))
            Line((-0.199970823, -0.003416154), (0.003416991, -0.199970808))
            ThreePointArc((0.003416991, -0.199970808), (1.176215921, -0.179930664), (1.789589173, -0.199354248))
            Line((1.789589173, -0.199354248), (1.80564794, 0))
        make_face()
    extrude(amount=2.5)
    with BuildSketch(Plane(origin=(30.444974788, 44.293318572, 0), x_dir=(-0.8679468320026006, 0.49665712198321443, 0), z_dir=(0, 0, 1))) as fillet2_piece_5:
        with BuildLine():
            CenterArc((1.837813114, -1.987599747), FILLET2_R, 96.383554137, 78.743811694)
            Line((-0.154958845, -1.817717677), (-0.354236041, -1.80072947))
            Line((-0.354236041, -1.80072947), (-0.199277196, 0.016988207))
            Line((-0.199277196, 0.016988207), (0.011368079, 0.199676656))
            ThreePointArc((0.011368079, 0.199676656), (0.534643198, 0.169885328), (1.593209014, 0.198759975))
            Line((1.593209014, 0.198759975), (1.61544575, 0))
        make_face()
    extrude(amount=2.5)
    with BuildSketch(Plane(origin=(35.7703782, 40.829996624, 0), x_dir=(0.8206094371402165, -0.5714894151919326, 0), z_dir=(0, 0, 1))) as fillet2_piece_6:
        with BuildLine():
            CenterArc((1.992981829, 1.989887472), FILLET2_R, 180.202436157, 84.033408627)
            Line((-0.007005688, 1.982821132), (-0.20700444, 1.982114498))
            Line((-0.20700444, 1.982114498), (-0.199998752, -0.000706634))
            Line((-0.199998752, -0.000706634), (0.006340066, -0.199899484))
            ThreePointArc((0.006340066, -0.199899484), (0.939555596, -0.170301368), (1.772027313, -0.198988747))
            Line((1.772027313, -0.198988747), (1.792114087, 0))
        make_face()
    extrude(amount=2.5)
    # the kernel refuses this fillet: 2 mm, written as the material it takes off along each edge

    # Fillet3
    fillet3_edges = [body_3.edges().sort_by_distance(p)[0] for p in [
        (39.250598762, 3.853385589, 2.5),
        (11.250603962, 3.853385589, 2.5),
    ]]
    fillet(fillet3_edges, radius=FILLET3_R)


solid = body_3.part
